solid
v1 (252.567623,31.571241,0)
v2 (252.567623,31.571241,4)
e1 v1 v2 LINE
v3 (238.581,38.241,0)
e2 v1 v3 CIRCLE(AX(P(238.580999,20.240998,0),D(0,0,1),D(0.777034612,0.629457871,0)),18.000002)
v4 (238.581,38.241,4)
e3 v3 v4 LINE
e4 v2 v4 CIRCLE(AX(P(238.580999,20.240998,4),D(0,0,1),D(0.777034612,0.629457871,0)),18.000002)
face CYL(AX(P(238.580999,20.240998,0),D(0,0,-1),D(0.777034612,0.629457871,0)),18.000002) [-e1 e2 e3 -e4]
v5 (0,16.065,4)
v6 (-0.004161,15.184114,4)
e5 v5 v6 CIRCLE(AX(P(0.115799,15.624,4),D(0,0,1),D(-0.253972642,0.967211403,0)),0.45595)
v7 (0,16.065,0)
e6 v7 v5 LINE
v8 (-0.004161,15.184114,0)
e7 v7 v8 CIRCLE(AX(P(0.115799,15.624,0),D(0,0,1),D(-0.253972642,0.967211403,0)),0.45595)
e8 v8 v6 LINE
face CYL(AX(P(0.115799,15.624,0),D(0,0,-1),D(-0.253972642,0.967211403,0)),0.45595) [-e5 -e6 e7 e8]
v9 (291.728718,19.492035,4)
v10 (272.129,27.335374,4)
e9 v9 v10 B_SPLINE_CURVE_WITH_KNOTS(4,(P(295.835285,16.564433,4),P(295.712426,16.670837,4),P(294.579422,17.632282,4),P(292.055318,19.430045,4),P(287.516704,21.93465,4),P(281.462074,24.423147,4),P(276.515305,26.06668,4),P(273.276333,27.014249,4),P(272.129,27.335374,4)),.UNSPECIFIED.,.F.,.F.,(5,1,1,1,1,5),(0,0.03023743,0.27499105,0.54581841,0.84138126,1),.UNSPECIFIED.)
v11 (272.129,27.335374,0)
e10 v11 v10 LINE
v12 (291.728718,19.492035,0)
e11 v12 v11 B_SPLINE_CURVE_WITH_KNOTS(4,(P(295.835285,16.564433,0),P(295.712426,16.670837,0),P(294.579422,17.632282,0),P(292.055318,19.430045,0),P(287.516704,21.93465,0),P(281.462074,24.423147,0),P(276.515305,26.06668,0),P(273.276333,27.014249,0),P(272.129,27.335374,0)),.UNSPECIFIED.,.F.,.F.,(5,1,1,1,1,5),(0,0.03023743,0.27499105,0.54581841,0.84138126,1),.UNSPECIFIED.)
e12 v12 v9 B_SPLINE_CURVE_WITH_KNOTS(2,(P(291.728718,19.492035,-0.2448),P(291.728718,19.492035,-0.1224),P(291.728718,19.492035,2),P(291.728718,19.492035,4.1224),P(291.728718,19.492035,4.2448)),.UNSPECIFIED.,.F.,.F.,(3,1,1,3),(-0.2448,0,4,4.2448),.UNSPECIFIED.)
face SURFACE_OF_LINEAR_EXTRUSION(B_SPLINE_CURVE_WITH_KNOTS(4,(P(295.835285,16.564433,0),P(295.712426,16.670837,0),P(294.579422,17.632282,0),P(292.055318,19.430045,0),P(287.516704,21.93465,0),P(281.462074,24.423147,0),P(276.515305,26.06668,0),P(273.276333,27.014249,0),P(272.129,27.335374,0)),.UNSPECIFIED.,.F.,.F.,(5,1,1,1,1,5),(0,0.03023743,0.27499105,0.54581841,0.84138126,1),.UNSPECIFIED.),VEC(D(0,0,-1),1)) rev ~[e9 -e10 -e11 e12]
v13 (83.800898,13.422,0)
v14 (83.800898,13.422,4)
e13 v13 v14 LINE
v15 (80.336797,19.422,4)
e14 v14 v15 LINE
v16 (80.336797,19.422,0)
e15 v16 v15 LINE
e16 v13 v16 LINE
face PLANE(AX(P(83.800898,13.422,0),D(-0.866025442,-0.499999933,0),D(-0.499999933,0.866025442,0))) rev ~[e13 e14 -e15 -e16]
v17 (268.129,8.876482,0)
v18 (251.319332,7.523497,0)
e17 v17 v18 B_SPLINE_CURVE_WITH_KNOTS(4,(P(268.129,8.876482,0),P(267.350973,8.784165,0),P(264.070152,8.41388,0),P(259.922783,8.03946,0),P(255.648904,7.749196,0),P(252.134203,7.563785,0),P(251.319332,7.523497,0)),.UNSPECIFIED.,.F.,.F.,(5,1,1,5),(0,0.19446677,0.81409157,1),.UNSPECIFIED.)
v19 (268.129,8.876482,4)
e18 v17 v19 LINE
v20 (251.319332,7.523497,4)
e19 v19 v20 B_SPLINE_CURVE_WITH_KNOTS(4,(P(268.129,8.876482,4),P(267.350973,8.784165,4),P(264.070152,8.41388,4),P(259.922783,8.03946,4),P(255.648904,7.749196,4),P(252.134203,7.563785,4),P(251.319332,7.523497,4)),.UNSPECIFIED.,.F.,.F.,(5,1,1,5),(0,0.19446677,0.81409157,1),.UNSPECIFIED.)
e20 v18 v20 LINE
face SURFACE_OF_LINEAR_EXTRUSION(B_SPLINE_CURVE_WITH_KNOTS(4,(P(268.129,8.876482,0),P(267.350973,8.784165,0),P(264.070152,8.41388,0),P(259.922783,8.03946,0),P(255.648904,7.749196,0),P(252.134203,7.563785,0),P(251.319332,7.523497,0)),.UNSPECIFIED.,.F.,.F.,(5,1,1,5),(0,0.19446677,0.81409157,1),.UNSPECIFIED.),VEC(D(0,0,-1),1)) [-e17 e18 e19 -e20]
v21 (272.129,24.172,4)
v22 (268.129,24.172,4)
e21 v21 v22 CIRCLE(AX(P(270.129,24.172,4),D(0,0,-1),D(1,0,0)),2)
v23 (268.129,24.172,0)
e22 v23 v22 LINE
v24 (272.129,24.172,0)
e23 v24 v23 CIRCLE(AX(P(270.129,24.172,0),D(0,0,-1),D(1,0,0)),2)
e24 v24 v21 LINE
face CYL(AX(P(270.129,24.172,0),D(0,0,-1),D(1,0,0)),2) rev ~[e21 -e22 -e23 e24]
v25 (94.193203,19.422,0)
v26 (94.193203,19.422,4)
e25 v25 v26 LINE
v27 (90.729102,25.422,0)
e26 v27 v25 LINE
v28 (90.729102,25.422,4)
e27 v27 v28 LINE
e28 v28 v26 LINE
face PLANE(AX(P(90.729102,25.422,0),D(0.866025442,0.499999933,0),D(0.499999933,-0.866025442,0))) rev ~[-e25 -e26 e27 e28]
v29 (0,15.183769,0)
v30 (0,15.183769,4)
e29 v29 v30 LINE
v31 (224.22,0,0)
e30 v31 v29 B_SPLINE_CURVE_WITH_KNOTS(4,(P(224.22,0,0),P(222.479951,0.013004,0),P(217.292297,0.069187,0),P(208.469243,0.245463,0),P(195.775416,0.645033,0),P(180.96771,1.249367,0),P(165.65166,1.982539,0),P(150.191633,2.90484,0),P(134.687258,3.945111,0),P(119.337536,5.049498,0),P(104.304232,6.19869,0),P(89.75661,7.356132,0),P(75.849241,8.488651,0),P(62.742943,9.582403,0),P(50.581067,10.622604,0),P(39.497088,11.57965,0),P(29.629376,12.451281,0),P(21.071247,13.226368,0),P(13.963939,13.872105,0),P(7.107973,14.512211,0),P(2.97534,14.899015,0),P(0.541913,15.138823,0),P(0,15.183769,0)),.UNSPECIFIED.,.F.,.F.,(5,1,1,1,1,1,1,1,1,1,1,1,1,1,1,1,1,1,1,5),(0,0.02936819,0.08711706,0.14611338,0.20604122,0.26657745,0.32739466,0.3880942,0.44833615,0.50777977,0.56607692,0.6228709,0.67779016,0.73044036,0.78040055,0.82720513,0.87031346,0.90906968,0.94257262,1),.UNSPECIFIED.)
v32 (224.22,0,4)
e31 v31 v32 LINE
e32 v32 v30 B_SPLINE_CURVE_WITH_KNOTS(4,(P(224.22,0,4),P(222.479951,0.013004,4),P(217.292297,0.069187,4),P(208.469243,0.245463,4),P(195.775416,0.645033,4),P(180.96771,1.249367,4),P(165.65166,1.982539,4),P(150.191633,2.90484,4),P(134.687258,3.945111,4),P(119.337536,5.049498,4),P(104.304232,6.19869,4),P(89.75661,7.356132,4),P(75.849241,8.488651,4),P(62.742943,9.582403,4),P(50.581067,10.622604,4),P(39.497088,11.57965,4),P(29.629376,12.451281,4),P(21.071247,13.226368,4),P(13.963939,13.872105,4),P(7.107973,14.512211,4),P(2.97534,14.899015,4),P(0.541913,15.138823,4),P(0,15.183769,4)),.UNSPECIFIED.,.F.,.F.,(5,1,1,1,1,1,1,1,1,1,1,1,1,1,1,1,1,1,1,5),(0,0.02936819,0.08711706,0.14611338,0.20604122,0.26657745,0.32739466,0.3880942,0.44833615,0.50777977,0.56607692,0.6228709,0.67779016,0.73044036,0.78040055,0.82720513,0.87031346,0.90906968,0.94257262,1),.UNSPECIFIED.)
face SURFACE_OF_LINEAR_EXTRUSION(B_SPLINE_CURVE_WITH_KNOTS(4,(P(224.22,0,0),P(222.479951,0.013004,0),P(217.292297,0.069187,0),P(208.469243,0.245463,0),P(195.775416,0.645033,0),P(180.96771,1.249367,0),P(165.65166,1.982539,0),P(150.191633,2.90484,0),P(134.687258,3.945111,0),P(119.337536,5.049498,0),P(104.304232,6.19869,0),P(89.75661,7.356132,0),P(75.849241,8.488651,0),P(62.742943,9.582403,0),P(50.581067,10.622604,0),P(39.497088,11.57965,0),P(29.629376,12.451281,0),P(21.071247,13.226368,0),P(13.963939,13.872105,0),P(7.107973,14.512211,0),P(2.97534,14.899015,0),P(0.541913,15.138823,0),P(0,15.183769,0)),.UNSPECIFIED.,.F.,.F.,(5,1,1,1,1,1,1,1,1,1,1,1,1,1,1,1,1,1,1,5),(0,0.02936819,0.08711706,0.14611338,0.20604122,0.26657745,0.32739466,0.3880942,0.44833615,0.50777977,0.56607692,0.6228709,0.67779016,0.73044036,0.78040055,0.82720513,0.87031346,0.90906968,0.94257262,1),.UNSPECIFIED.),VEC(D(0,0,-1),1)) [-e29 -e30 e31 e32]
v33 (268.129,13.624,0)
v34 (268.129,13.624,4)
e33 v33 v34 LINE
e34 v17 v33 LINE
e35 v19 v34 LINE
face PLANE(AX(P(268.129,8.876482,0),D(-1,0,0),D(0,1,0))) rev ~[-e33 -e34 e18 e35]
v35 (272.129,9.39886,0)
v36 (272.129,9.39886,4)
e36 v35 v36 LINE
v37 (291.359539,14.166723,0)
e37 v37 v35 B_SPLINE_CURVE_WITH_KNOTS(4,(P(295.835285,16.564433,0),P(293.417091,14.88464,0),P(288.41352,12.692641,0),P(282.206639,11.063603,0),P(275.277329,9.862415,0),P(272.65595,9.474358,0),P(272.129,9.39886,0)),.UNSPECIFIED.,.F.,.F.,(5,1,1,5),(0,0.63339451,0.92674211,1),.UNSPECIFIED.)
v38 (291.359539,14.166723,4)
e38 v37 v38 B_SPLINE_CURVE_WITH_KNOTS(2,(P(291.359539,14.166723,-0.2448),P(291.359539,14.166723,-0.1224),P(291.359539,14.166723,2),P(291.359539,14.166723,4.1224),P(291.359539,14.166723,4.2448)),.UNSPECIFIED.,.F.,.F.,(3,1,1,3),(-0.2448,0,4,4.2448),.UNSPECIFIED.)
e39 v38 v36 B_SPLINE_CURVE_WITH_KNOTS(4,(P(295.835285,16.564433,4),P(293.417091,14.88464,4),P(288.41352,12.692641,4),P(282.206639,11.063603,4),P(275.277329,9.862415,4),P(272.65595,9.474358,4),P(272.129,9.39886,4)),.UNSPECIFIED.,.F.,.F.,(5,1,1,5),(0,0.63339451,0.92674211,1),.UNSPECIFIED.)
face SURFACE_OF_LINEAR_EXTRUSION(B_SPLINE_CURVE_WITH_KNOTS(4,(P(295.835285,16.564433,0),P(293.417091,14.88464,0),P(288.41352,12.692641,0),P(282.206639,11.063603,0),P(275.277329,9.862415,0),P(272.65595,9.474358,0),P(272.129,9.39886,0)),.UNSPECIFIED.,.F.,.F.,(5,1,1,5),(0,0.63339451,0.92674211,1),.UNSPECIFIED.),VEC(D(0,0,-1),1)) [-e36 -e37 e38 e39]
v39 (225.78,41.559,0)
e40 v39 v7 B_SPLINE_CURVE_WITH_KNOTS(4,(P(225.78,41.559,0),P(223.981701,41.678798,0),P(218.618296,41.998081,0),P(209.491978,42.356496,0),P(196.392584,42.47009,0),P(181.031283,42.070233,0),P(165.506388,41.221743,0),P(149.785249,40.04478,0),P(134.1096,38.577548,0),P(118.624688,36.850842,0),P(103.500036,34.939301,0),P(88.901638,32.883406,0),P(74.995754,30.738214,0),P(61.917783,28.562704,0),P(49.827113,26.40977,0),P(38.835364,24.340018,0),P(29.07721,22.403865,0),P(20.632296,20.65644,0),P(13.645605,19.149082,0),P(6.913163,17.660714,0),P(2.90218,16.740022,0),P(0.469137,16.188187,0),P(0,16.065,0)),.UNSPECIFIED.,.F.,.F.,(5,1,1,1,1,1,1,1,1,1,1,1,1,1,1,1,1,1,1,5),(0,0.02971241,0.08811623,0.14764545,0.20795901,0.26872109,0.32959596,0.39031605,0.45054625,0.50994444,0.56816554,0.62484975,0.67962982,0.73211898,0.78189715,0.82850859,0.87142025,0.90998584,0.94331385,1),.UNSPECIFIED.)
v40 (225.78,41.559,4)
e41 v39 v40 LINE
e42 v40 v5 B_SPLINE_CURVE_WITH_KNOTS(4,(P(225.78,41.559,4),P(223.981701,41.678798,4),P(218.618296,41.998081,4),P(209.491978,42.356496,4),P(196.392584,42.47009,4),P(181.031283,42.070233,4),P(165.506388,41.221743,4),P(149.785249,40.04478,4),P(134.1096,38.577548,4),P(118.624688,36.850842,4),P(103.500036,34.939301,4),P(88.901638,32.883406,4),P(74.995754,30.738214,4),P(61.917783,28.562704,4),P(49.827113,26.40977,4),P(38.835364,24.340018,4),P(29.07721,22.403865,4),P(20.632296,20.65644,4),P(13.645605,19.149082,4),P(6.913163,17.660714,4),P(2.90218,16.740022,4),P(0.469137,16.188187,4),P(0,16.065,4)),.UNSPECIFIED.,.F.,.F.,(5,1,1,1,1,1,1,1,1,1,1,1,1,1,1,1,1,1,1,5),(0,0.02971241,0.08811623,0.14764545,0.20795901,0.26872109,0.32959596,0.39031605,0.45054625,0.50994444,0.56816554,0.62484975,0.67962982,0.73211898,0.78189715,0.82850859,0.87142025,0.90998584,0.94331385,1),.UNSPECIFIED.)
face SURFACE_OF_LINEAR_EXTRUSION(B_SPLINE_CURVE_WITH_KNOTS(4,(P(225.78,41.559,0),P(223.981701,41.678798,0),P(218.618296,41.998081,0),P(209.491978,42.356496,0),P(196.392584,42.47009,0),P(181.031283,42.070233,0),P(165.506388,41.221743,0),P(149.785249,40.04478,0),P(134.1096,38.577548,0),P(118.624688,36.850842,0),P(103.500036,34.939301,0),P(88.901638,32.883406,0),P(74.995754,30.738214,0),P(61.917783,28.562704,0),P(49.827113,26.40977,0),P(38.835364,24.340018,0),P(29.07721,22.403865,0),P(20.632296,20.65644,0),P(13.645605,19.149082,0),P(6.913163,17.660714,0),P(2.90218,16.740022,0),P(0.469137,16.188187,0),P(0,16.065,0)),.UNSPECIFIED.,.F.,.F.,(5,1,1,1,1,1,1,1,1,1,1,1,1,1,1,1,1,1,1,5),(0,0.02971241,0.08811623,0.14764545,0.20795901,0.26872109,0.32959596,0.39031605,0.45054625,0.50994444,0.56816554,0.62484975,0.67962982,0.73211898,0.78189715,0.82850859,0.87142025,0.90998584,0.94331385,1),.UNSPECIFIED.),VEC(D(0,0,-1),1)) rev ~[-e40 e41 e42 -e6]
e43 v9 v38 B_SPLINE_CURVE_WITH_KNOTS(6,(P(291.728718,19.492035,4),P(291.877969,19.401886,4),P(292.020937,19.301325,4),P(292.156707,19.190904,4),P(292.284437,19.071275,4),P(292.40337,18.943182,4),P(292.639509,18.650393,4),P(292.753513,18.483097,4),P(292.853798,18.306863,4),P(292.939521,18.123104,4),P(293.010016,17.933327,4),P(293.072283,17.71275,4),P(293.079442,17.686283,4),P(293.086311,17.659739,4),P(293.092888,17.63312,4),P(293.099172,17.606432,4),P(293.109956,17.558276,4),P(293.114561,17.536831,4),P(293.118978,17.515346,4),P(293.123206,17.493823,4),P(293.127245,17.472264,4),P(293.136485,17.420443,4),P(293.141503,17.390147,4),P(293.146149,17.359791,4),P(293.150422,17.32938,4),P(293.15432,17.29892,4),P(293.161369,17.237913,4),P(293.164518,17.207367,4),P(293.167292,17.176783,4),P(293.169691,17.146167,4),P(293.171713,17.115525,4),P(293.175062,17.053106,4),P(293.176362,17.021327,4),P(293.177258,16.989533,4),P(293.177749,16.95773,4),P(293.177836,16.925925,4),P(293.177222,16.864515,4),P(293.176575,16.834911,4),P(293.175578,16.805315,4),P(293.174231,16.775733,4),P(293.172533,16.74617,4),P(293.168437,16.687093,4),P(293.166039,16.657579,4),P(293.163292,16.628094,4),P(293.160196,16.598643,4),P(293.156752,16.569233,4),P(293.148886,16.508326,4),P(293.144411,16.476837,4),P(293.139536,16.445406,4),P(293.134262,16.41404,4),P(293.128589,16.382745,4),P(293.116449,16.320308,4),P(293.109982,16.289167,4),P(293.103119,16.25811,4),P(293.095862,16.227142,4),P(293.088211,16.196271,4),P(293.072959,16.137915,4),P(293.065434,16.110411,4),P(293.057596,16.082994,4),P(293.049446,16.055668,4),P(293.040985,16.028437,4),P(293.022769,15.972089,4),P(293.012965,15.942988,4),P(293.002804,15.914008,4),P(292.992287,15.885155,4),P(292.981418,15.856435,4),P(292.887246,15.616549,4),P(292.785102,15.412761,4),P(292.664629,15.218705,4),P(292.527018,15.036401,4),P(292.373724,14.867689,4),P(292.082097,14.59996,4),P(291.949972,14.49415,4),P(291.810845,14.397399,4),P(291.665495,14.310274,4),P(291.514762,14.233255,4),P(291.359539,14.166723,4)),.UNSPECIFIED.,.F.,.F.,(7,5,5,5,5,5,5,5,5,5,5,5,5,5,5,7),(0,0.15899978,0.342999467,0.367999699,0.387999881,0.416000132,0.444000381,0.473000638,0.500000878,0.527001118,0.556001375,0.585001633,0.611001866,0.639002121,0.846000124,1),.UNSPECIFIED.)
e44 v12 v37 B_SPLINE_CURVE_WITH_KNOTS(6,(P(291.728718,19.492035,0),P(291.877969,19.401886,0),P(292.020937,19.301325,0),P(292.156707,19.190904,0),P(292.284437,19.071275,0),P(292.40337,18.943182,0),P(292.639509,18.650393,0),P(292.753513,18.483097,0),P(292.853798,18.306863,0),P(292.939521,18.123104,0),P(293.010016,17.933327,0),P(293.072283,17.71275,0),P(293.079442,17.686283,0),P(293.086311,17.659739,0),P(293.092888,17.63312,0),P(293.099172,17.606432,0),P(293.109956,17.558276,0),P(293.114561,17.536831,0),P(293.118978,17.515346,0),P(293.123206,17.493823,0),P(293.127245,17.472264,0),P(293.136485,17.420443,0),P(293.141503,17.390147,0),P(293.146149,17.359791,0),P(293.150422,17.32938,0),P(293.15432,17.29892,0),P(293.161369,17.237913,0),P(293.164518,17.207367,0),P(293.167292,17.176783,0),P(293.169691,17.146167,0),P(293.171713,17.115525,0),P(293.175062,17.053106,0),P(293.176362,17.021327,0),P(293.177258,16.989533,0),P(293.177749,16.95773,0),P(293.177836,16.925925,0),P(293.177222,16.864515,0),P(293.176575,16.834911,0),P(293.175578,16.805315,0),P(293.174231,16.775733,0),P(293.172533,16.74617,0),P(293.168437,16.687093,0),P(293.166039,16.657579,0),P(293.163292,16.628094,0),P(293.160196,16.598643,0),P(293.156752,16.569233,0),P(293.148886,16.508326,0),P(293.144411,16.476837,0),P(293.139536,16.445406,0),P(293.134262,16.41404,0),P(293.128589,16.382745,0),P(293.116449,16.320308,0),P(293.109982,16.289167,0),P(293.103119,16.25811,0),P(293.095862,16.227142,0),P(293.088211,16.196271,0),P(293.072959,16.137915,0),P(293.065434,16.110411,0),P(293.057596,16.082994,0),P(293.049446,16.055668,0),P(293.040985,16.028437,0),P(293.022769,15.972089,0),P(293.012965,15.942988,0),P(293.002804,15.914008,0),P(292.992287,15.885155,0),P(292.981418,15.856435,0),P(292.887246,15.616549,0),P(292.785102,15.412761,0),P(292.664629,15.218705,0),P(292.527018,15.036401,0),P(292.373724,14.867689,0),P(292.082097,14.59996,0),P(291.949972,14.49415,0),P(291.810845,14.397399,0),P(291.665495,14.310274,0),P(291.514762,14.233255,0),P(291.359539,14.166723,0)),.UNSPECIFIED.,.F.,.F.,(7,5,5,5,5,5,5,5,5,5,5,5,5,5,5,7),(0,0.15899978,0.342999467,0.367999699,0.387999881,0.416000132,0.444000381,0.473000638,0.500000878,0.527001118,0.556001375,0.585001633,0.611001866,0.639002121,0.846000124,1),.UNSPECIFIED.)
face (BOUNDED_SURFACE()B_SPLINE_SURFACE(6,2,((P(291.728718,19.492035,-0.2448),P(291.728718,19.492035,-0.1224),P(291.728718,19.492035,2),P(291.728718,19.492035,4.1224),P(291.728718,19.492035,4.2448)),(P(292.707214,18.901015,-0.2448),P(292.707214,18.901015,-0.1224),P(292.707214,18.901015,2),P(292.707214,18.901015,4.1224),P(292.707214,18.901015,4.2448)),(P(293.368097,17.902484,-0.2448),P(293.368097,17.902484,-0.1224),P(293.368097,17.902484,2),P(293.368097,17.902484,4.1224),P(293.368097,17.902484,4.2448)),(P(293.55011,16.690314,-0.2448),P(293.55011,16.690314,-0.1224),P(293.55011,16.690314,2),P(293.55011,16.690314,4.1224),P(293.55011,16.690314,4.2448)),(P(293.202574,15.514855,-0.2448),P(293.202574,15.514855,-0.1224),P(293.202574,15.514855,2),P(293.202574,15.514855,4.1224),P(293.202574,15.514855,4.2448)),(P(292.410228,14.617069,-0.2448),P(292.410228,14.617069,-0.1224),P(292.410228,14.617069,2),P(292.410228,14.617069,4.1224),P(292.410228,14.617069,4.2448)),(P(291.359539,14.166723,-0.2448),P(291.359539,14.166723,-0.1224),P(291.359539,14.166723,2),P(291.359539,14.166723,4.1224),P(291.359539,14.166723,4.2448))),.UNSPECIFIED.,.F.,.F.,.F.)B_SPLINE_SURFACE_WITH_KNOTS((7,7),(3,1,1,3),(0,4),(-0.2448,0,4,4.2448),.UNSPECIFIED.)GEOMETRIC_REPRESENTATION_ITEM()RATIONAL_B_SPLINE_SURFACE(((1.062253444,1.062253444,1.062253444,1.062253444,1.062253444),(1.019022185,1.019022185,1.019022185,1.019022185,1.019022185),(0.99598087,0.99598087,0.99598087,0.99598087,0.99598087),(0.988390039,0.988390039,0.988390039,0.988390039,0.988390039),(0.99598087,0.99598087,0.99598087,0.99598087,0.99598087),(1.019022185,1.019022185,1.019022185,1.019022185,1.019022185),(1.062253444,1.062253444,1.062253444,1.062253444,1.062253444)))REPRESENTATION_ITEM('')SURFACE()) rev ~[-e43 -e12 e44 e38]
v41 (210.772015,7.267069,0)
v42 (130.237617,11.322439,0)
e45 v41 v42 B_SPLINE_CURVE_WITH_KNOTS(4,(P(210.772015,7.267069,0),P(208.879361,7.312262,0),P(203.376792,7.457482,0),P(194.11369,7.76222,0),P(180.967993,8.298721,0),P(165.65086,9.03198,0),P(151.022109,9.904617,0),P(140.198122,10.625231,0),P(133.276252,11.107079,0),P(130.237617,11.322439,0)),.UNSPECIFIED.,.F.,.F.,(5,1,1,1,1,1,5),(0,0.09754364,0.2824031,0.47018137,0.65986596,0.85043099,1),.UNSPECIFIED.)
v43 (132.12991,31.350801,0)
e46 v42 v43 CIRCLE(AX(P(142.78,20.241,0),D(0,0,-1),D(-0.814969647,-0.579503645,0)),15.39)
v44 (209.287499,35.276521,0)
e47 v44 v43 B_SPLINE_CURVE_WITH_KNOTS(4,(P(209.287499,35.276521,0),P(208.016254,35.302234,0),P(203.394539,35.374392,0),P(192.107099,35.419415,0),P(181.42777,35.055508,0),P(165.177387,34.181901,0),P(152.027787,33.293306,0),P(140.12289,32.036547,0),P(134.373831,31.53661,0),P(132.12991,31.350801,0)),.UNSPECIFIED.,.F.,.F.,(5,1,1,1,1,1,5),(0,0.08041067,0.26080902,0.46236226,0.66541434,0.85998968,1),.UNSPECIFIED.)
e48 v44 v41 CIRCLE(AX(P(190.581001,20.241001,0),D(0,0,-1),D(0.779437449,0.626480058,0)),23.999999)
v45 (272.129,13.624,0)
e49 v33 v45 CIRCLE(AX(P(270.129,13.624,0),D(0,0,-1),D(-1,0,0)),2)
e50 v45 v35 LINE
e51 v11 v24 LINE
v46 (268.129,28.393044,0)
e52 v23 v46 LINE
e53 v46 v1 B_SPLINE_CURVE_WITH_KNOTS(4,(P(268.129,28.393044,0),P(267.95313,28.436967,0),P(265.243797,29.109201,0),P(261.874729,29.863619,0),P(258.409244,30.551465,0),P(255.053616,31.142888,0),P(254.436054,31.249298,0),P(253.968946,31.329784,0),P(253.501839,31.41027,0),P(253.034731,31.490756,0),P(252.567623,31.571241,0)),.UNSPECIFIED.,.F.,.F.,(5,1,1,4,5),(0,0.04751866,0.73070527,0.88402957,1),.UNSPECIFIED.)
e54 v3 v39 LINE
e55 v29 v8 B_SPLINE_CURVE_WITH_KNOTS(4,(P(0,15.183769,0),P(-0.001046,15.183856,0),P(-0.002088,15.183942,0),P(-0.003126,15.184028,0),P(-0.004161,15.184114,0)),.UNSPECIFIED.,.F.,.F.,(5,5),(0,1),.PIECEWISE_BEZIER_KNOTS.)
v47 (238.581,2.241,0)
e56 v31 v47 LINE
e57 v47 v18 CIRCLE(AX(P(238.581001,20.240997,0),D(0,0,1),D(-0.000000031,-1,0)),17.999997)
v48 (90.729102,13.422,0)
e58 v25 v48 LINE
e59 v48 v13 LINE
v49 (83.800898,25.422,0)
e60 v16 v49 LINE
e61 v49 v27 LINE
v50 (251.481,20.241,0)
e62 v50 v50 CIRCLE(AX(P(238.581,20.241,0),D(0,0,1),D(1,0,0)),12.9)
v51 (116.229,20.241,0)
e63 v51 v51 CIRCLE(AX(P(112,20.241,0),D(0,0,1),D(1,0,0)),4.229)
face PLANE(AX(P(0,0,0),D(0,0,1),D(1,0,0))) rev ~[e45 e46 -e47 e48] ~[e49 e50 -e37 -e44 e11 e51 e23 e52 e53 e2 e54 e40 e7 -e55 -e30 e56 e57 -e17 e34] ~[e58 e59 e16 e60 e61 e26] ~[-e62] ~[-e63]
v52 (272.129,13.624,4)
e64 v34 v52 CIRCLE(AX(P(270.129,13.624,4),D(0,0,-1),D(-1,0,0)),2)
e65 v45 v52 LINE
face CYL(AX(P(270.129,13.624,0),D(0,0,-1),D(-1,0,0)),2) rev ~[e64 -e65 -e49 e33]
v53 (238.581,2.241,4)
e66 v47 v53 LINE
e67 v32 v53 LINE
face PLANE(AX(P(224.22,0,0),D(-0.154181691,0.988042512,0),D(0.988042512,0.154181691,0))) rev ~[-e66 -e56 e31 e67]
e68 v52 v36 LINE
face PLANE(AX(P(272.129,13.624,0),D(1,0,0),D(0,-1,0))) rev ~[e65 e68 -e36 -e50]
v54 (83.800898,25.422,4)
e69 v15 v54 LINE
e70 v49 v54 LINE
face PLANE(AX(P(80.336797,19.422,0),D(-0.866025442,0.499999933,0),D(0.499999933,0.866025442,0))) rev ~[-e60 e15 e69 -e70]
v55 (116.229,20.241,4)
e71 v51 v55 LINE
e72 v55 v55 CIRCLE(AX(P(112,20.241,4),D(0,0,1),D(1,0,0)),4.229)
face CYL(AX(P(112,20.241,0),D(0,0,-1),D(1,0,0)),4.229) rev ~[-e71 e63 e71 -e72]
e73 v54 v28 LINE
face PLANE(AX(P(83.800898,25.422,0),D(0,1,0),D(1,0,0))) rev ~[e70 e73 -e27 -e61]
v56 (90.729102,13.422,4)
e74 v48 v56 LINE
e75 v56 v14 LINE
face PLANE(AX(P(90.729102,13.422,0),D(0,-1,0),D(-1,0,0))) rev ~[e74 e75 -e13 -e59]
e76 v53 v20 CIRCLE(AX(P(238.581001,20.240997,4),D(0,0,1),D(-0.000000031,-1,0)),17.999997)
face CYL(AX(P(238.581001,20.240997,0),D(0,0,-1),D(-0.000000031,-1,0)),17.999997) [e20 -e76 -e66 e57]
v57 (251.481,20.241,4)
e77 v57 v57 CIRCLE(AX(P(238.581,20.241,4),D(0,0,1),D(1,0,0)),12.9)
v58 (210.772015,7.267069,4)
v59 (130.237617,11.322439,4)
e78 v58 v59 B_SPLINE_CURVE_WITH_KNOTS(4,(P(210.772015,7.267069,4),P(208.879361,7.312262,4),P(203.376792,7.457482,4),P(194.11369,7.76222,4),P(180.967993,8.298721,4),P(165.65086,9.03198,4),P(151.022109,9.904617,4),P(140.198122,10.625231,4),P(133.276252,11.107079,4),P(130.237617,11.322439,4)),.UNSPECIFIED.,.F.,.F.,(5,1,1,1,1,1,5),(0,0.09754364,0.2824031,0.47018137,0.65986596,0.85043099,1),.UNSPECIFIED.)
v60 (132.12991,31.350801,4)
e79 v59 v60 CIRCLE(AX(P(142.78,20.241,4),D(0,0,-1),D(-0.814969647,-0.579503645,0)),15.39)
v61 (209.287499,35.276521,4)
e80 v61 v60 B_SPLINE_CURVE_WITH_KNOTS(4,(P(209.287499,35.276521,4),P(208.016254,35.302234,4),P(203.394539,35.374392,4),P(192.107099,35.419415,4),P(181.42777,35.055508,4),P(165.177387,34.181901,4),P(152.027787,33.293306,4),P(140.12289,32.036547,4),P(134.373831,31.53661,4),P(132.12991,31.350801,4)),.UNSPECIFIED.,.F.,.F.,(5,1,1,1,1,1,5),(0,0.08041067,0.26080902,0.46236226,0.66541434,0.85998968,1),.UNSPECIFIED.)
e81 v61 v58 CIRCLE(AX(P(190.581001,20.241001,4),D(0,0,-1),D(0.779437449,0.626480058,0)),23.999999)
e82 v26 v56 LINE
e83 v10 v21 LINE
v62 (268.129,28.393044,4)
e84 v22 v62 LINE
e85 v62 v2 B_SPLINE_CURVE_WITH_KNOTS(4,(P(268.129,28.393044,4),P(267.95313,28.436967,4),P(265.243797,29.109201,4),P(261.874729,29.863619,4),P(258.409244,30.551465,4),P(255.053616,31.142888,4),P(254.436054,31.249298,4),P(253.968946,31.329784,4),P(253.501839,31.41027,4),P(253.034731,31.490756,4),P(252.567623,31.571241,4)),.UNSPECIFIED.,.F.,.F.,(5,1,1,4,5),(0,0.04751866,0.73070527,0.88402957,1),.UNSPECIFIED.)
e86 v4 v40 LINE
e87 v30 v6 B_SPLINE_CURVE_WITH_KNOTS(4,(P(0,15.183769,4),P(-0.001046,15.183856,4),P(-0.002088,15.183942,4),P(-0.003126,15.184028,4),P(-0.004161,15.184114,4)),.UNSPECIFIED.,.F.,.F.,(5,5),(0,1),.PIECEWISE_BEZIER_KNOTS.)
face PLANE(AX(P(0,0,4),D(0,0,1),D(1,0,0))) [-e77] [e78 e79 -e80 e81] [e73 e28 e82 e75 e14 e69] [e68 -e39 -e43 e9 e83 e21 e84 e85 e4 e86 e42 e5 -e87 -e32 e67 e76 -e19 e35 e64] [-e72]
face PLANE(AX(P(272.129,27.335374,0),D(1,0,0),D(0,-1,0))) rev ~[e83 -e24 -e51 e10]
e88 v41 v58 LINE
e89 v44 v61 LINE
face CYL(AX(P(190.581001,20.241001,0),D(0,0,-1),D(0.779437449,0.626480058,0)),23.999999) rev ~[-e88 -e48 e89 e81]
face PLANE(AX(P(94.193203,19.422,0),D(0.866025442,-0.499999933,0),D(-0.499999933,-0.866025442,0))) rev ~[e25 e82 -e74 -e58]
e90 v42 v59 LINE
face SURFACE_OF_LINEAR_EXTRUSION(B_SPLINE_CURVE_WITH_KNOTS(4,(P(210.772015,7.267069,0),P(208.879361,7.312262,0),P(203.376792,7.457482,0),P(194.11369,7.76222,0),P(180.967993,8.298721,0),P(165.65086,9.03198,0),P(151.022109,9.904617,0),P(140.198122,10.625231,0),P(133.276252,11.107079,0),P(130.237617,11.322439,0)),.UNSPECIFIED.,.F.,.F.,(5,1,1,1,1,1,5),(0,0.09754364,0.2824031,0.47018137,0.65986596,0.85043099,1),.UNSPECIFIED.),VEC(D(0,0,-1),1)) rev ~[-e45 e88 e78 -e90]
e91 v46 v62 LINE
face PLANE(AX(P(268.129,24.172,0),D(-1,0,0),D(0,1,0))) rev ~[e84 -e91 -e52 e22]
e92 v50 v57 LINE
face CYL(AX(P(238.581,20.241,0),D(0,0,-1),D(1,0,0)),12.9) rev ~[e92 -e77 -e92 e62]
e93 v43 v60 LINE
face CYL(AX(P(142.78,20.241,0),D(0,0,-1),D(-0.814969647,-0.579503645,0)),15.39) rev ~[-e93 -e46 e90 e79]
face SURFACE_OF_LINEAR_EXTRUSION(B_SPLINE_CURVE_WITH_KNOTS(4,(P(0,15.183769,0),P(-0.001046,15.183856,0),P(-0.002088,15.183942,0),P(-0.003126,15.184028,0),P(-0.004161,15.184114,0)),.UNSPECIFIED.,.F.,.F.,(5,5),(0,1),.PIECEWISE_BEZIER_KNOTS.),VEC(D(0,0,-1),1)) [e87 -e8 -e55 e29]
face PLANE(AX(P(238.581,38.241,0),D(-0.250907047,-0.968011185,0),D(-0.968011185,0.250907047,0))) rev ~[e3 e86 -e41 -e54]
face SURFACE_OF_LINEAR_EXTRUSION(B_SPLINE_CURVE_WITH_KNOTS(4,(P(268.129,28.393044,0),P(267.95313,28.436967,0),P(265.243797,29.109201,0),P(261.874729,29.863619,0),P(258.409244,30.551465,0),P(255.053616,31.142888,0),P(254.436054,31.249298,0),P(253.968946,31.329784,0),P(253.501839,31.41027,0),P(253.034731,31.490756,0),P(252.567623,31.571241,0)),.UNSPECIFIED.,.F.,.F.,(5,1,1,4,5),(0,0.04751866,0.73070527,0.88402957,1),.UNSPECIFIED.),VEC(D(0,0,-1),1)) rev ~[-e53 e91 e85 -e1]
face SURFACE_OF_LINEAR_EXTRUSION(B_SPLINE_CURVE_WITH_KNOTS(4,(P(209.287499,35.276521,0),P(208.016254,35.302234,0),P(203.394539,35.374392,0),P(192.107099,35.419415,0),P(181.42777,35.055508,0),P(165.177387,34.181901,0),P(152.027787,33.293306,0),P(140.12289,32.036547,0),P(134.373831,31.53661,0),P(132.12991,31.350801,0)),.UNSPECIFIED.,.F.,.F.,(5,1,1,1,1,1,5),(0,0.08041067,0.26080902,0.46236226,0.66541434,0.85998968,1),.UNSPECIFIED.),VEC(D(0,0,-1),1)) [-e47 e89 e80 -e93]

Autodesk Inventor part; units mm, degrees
ref_plane "YZ Plane" through (0, 0, 0) normal (1, 0, 0) x (0, 1, 0)
ref_plane "XZ Plane" through (0, 0, 0) normal (0, 1, 0) x (-1, 0, 0)
ref_plane "XY Plane" through (0, 0, 0) normal (0, 0, 1) x (1, 0, 0)
sketch "Sketch1" plane through (0, 0, 0) normal (0, 0, 1) x (1, 0, 0)
  spline S0 degree 4 poles (254.436054, 38.258138) (252.159915, 38.650332) (246.788709, 39.499265) (237.984874, 40.618279) (225.357478, 41.704285) (211.202741, 42.341661) (196.392584, 42.47009) (181.031283, 42.070233) (165.506388, 41.221743) (149.785249, 40.04478) (134.1096, 38.577548) (118.624688, 36.850842) (103.500036, 34.939301) (88.901638, 32.883406) (74.995754, 30.738214) (61.917783, 28.562704) (49.827113, 26.40977) (38.835364, 24.340018) (29.07721, 22.403865) (20.632296, 20.65644) (13.645605, 19.149082) (6.913163, 17.660714) (2.90218, 16.740022) (0.469137, 16.188187) (0, 16.065) knots 0.21429705 0.21429705 0.21429705 0.21429705 0.21429705 0.2433201 0.28177524 0.32154178 0.36237973 0.40400459 0.44617789 0.48866482 0.5312306 0.57368816 0.61580317 0.65733642 0.6980466 0.73768213 0.77598623 0.81268845 0.84749504 0.88008735 0.91009265 0.93705903 0.9603631 1 1 1 1 1
  spline S1 degree 4 poles (299.999997, 15.624) (299.805651, 13.312974) (297.70854, 10.343184) (293.050897, 7.5008) (285.395888, 4.883043) (278.112378, 3.216454) (269.51472, 1.892454) (259.681019, 0.912997) (248.712883, 0.278332) (236.711867, -0.030891) (223.806667, -0.050368) (210.125319, 0.193333) (195.775416, 0.645033) (180.96771, 1.249367) (165.65166, 1.982539) (150.191633, 2.90484) (134.687258, 3.945111) (119.337536, 5.049498) (104.304232, 6.19869) (89.75661, 7.356132) (75.849241, 8.488651) (62.742943, 9.582403) (50.581067, 10.622604) (39.497088, 11.57965) (29.629376, 12.451281) (21.071247, 13.226368) (13.963939, 13.872105) (7.103576, 14.512622) (2.968279, 14.899676) (0.533018, 15.1397) (-0.004161, 15.184114) knots 0 0 0 0 0 0.05437224 0.07982113 0.10791215 0.1384988 0.1713415 0.20618709 0.24278377 0.28089063 0.3202767 0.36071301 0.4020228 0.44398485 0.4863729 0.52895769 0.5714601 0.61364209 0.65526508 0.6960853 0.73585299 0.77430798 0.81117416 0.84615676 0.87892978 0.90911464 0.93625212 0.9597112 1 1 1 1 1
  arc A0 (0, 16.065) -> (-0.004161, 15.184114) centre (0.115799, 15.624) ccw
  line L0 (0.115799, 15.624) -> (227.990221, 15.624) construction
  line L1 (299.999997, 15.624) -> (0.115799, 15.624) construction
  line L2 (299.999997, 15.624) -> (199.999997, 15.624) construction
  line L3 (199.999997, 15.624) -> (199.999997, 42.37734) construction
  line L4 (199.999997, 15.624) -> (199.999997, 0.52729)
  line L5 (0, 0) -> (0, 20.241)
  line L6 (0, 20.241) -> (238.581, 20.241) construction
  circle A1 centre (238.581, 20.241) radius 14
  line L7 (238.581, 20.241) -> (208.581, 20.241)
  line L8 (238.581, 25.359) -> (238.581, 20.241)
  line L9 (0, 20.241) -> (112, 20.241) construction
  circle A2 centre (112, 20.241) radius 5.39
  line L10 (0, 15.624) -> (112, 15.624) construction
  line L11 (0, 15.624) -> (112, 15.624) construction
  line L12 (112, 15.624) -> (112, 35.994456)
  line L13 (112, 15.624) -> (112, 5.61525)
  spline S2 degree 4 poles (299.285198, 20.241) (299.227939, 20.131643) (299.16804, 20.023225) (299.105573, 19.915754) (299.040612, 19.809235) knots 0 0 0 0 0 1 1 1 1 1
  line L14 (299.207055, 20.082158) -> (298.87417, 19.536312) construction
  arc A3 (298.903999, 19.593162) -> (299.170168, 20.029611) centre (292.291091, 23.925437) ccw construction
  line L15 (299.43203, 20.521431) -> (299.138367, 19.960569) construction
  arc A4 (299.163926, 20.01882) -> (299.398715, 20.467241) centre (292.801001, 23.636075) ccw construction
  spline S3 degree 2 poles (295.850621, 16.559978) (295.157262, 16.069203) (294.393311, 15.624) knots 0 0 0 1 1 1
  line L16 (294.550692, 15.715716) -> (294.235931, 15.532284) construction
  arc A5 (294.267154, 15.551069) -> (294.518956, 15.69781) centre (283.884356, 33.65696) ccw construction
  spline S4 degree 4 poles (296.856901, 15.624) (296.618326, 15.862944) (296.370731, 16.098547) (296.114674, 16.330852) (295.850621, 16.559978) knots 0 0 0 0 0 1 1 1 1 1
  spline S5 degree 4 poles (219.58717, 34.91187) (218.695351, 34.95198) (214.858509, 35.106335) (210.707211, 35.329502) (192.898023, 35.446366) (181.42777, 35.055508) (165.177387, 34.181901) (149.561876, 33.12667) (133.828431, 31.347909) (128.265438, 31.097419) (123.390775, 30.590026) knots 0 0 0 0 0 0.13924435 0.23321956 0.36393672 0.50998276 0.65711487 0.7981047 1 1 1 1 1
  line L17 (295.959293, 16.465681) -> (295.74195, 16.654276) construction
  arc A6 (295.937354, 16.484307) -> (295.763482, 16.635181) centre (281.87292, 0.451609) ccw construction
  line L18 (232.743774, 34.364452) -> (201.193566, 35.681454) construction
  arc A7 (229.586762, 34.454933) -> (204.347135, 35.508511) centre (136.348344, -1896.324468) ccw construction
  arc A8 (264.266057, 15.123) -> (264.360826, 15.624) centre (238.581, 20.241) ccw
  circle A9 centre (238.581, 20.241) radius 24
  circle A10 centre (112, 20.241) radius 15.39
  spline S6 degree 4 poles (299.999997, 15.624) (300.269142, 17.933652) (298.783415, 21.267693) (294.693448, 24.979847) (287.53174, 28.940551) (280.486947, 31.820538) (271.480983, 34.718213) (262.486804, 36.793013) (257.700386, 37.695672) (254.436054, 38.258138) knots 0 0 0 0 0 0.24755477 0.36385739 0.4925498 0.63299607 0.77826439 1 1 1 1 1
  line L19 (285.294543, 32.941011) -> (223.577565, 43.575266) construction
  arc A11 (278.722442, 32.634865) -> (229.668212, 41.087243) centre (217.218351, -177.738587) ccw construction
  line L20 (285.294543, 32.941011) -> (223.577565, 43.575266) construction
  arc A12 (278.877125, 33.041766) -> (229.658629, 41.522447) centre (200.894913, -272.473315) ccw construction
  spline S7 degree 4 poles (251.493, 31.73616) (243.700929, 32.967588) (232.160237, 34.296592) (216.442824, 35.287928) (196.392341, 35.461091) (181.031705, 35.061513) (165.505292, 34.212684) (149.788285, 33.036509) (134.101234, 31.567156) (118.647366, 29.846206) (103.439709, 27.919279) (89.058912, 25.903716) (74.837064, 23.692714) (62.488433, 21.669546) (49.639937, 19.354465) (46.379459, 18.742869) (43.812536, 18.259032) knots 0 0 0 0 0 0.1639631 0.23233838 0.3020312 0.37264227 0.44377843 0.51504665 0.58613365 0.65664712 0.72618654 0.7943479 0.86070997 0.92034602 1 1 1 1 1 construction
  spline S8 degree 4 poles (295.845009, 16.556007) (295.719822, 16.664559) (294.584958, 17.628339) (292.058546, 19.428263) (287.516704, 21.93465) (280.467029, 24.832118) (271.97142, 27.522599) (264.208658, 29.400369) (258.409244, 30.551465) (255.053616, 31.142888) (254.436054, 31.249298) (253.968946, 31.329784) (253.501839, 31.41027) (253.034731, 31.490756) (252.567623, 31.571241) knots 0 0 0 0 0 0.01890503 0.16895946 0.33499927 0.51620401 0.71116085 0.9183366 0.96483207 0.96483207 0.96483207 0.96483207 1 1 1 1 1
  line L21 (285.294543, 25.932171) -> (223.577565, 36.566425) construction
  line L22 (285.294543, 25.932171) -> (223.577565, 36.566425) construction
  arc A13 (278.722442, 25.626025) -> (229.668212, 34.078402) centre (217.218351, -184.747428) ccw construction
  line L23 (270.129, 9.125374) -> (275.129, 9.125374) construction
  line L24 (281.07, 24.45816) -> (286.07, 24.45816) construction
  line L25 (318.821413, -3.367269) -> (272.868604, 36.479282) construction
  arc A14 (303.207925, 0.551953) -> (278.959518, 21.578206) centre (281.857648, 0.425162) ccw construction
  spline S9 degree 4 poles (295.835285, 16.564433) (293.417091, 14.88464) (288.41352, 12.692641) (280.70627, 10.669821) (269.511023, 8.939829) (259.682627, 7.96324) (248.712204, 7.32734) (236.712148, 7.018633) (223.806545, 6.998947) (210.125394, 7.242728) (195.775305, 7.694406) (180.967993, 8.298721) (165.65086, 9.03198) (150.193891, 9.954022) (134.681006, 10.995018) (119.354518, 12.097424) (104.258979, 13.251926) (89.874814, 14.39542) (75.752353, 15.547068) (62.906491, 16.616479) (50.510696, 17.677636) (46.516568, 18.024605) (43.812536, 18.259032) knots 0 0 0 0 0 0.08476672 0.12402522 0.16617938 0.21090431 0.25787677 0.30678758 0.35734028 0.40924097 0.46226281 0.51612182 0.5705276 0.62518592 0.67973848 0.7338798 0.78730362 0.83969707 0.89073959 0.93714265 1 1 1 1 1
  spline S10 degree 4 poles (21.462276, 20.241) (20.622656, 20.316984) (20.124028, 20.362207) (19.919133, 20.380856) (19.554048, 20.414029) knots 0 0 0 0 0 1 1 1 1 1 construction
  line L26 (68.488377, 16.119755) -> (19.136695, 20.398308) construction
  arc A15 (63.551474, 16.528056) -> (24.070206, 19.950891) centre (-819.899413, -9944.371227) ccw construction
  line L27 (21.724437, 20.217275) -> (21.200116, 20.264725) construction
  arc A16 (21.252548, 20.259982) -> (21.672005, 20.222022) centre (898.635849, 9712.955601) ccw construction
  line L28 (74.254065, 23.996937) -> (13.371006, 12.521126) construction
  arc A17 (68.175943, 22.793945) -> (19.469999, 13.613391) centre (1053.390082, -5337.891027) ccw construction
  spline S11 degree 4 poles (218.437499, 7.193419) (217.617295, 7.240848) (213.819214, 7.468804) (209.586315, 6.850678) (192.548492, 7.944114) (181.146901, 8.16297) (165.746092, 9.02826) (149.142366, 9.880106) (139.977668, 10.751942) (129.107316, 11.246393) (124.68665, 11.528881) knots 0 0 0 0 0 0.12763083 0.21372336 0.33362841 0.4674456 0.60262129 0.73842442 0.88039529 0.88039529 0.88039529 0.88039529 0.88039529
  line L29 (133.533683, 10.96354) -> (115.839617, 12.094223) construction
  arc A18 (117.617989, 12.078874) -> (131.767822, 11.174674) centre (141.026952, 267.238396) ccw construction
  line L30 (140.664975, 32.388062) -> (106.116576, 28.79199) construction
  arc A19 (137.221962, 31.449676) -> (109.679039, 28.58279) centre (140.622493, -134.959578) ccw construction
  circle A20 centre (238.581, 20.241) radius 18
  line L31 (238.581, 38.241) -> (225.78, 41.559)
  line L32 (238.581, 2.241) -> (224.22, 0)
  line L33 (214.581, 20.241) -> (214.581, 42.126574) construction
  line L34 (127.39, 20.241) -> (127.39, 11.525517) construction
  line L35 (127.39, 20.241) -> (131.31394, 20.241) construction
  line L36 (96.61, 20.241) -> (96.61, 13.863077) construction
  line L37 (270.129, 5.61525) -> (270.129, 15.624) construction
  line L38 (272.129, 7.61525) -> (272.129, 13.624)
  line L39 (268.129, 13.624) -> (268.129, 7.61525)
  arc A21 (268.129, 7.61525) -> (272.129, 7.61525) centre (270.129, 7.61525) ccw
  arc A22 (272.129, 13.624) -> (268.129, 13.624) centre (270.129, 13.624) ccw
  line L40 (270.129, 32.18075) -> (270.129, 22.172) construction
  line L41 (272.129, 30.18075) -> (272.129, 24.172)
  line L42 (268.129, 24.172) -> (268.129, 30.18075)
  arc A23 (272.129, 30.18075) -> (268.129, 30.18075) centre (270.129, 30.18075) ccw
  arc A24 (268.129, 24.172) -> (272.129, 24.172) centre (270.129, 24.172) ccw
  arc A25 (199.999997, 42.315467) -> (199.853847, 42.377258) centre (190.581, 20.241) ccw
  arc A26 (171.272979, 34.495835) -> (171.268099, 34.489223) centre (190.581, 20.241) ccw
  arc A27 (210.748391, 7.230376) -> (209.287499, 35.276521) centre (190.581, 20.241) ccw
  arc A28 (169.445537, 8.870309) -> (169.474432, 8.816764) centre (190.581, 20.241) ccw
  arc A29 (153.976817, 9.682431) -> (154.030255, 9.739387) centre (142.78, 20.241) ccw
  arc A30 (151.241916, 33.095886) -> (151.219343, 33.110716) centre (142.78, 20.241) ccw
  arc A31 (132.12991, 31.350801) -> (130.322928, 11.203663) centre (142.78, 20.241) ccw
  arc A32 (95.274104, 13.969298) -> (95.169771, 26.74146) centre (81.22, 20.241) ccw
  arc A33 (66.333989, 16.334751) -> (66.538876, 15.624) centre (81.22, 20.241) ccw
  line L43 (112, 20.241) -> (112, 14.851) construction
  line L44 (112, 14.851) -> (87.265, 19.422) construction
  circle A34 centre (87.265, 19.422) radius 4
  circle A35 centre (238.581, 20.241) radius 12.9
  circle A36 centre (112, 20.241) radius 4.229
  circle A37 centre (87.265, 19.422) radius 6
  line L45 (83.800898, 13.422) -> (80.336797, 19.422)
  line L46 (80.336797, 19.422) -> (83.800898, 25.422)
  line L47 (83.800898, 25.422) -> (90.729102, 25.422)
  line L48 (90.729102, 25.422) -> (94.193203, 19.422)
  line L49 (94.193203, 19.422) -> (90.729102, 13.422)
  line L50 (90.729102, 13.422) -> (83.800898, 13.422)
  point P0 (0.783, 16.254)
  point P1 (3.213, 16.812)
  point P2 (7.239, 17.724)
  point P3 (12.813, 18.96)
  point P4 (19.884, 20.484)
  point P5 (28.374, 22.245)
  point P6 (38.199, 24.195)
  point P7 (49.254, 26.28)
  point P8 (61.419, 28.446)
  point P9 (74.571, 30.636)
  point P10 (88.56, 32.793)
  point P11 (103.242, 34.86)
  point P12 (118.455, 36.783)
  point P13 (134.028, 38.511)
  point P14 (149.793, 39.984)
  point P15 (165.576, 41.16)
  point P16 (181.206, 41.985)
  point P17 (196.638, 42.363)
  point P18 (211.554, 42.222)
  point P19 (239.145, 40.389)
  point P20 (262.68, 36.666)
  point P21 (272.577, 34.218)
  point P22 (281.07, 31.467)
  point P23 (288.069, 28.491)
  point P24 (293.505, 25.359)
  point P25 (297.324, 22.137)
  point P26 (300, 15.624)
  point P27 (0.861, 15.105)
  point P28 (3.342, 14.868)
  point P29 (7.446, 14.481)
  point P30 (13.122, 13.953)
  point P31 (20.31, 13.296)
  point P32 (28.92, 12.519)
  point P33 (38.856, 11.64)
  point P34 (50.007, 10.674)
  point P35 (62.244, 9.63)
  point P36 (75.429, 8.529)
  point P37 (89.418, 7.389)
  point P38 (104.052, 6.228)
  point P39 (119.172, 5.076)
  point P40 (134.613, 3.966)
  point P41 (150.207, 2.928)
  point P42 (165.783, 2.013)
  point P43 (181.167, 1.263)
  point P44 (196.068, 0.663)
  point P45 (210.468, 0.225)
  point P46 (237.189, 0.039)
  point P47 (249.246, 0.378)
  point P48 (260.262, 1.05)
  point P49 (270.129, 2.076)
  point P50 (278.739, 3.462)
  point P51 (285.993, 5.211)
  point P52 (291.81, 7.314)
  point P53 (296.121, 9.756)
  point P54 (298.863, 12.531)
  point P55 (199.999997, 15.624)
  point P56 (225.364219, 15.624)
  point P57 (238.581, 6.241)
  point P58 (238.581, 34.241)
  point P59 (225.364219, 15.624)
  point P60 (251.797781, 15.624)
  point P61 (0, 16.065)
  point P62 (0, 15.183769)
  point P63 (224.581, 20.241)
  point P64 (112, 25.631)
  point P65 (0, 9.065)
  point P66 (0.783, 9.254)
  point P67 (3.213, 9.812)
  point P68 (7.239, 10.724)
  point P69 (12.813, 11.96)
  point P70 (19.884, 13.484)
  point P71 (28.374, 15.245)
  point P72 (38.199, 17.195)
  point P73 (49.254, 19.28)
  point P74 (61.419, 21.446)
  point P75 (74.571, 23.636)
  point P76 (88.56, 25.793)
  point P77 (103.242, 27.86)
  point P78 (118.455, 29.783)
  point P79 (134.028, 31.511)
  point P80 (149.793, 32.984)
  point P81 (165.576, 34.16)
  point P82 (181.206, 34.985)
  point P83 (225.78, 34.559)
  point P84 (239.145, 33.389)
  point P85 (251.493, 31.745)
  point P86 (262.68, 29.666)
  point P87 (272.577, 27.218)
  point P88 (281.07, 24.467)
  point P89 (288.069, 21.491)
  point P90 (293.505, 18.359)
  point P91 (297.324, 15.137)
  point P92 (299.493, 11.879)
  point P93 (300, 8.624)
  point P94 (-0.004161, 22.184114)
  point P95 (0.861, 22.105)
  point P96 (3.342, 21.868)
  point P97 (7.446, 21.481)
  point P98 (13.122, 20.953)
  point P99 (20.31, 20.296)
  point P100 (28.92, 19.519)
  point P101 (38.856, 18.64)
  point P102 (50.007, 17.674)
  point P103 (62.244, 16.63)
  point P104 (75.429, 15.529)
  point P105 (89.418, 14.389)
  point P106 (104.052, 13.228)
  point P107 (119.172, 12.076)
  point P108 (134.613, 10.966)
  point P109 (150.207, 9.928)
  point P110 (165.783, 9.013)
  point P111 (181.167, 8.263)
  point P112 (196.068, 7.663)
  point P113 (210.468, 7.225)
  point P114 (224.22, 7)
  point P115 (237.189, 7.039)
  point P116 (249.246, 7.378)
  point P117 (260.262, 8.05)
  point P118 (270.129, 9.076)
  point P119 (278.739, 10.462)
  point P120 (285.993, 12.211)
  point P121 (291.81, 14.314)
  point P122 (296.121, 16.756)
  point P123 (298.863, 19.531)
  point P124 (300, 22.624)
  point P125 (18.740477, 20.241)
  point P126 (216.96867, 35.022953)
  point P127 (0, 16.065)
  point P128 (296.856901, 15.624)
  point P129 (294.393311, 15.624)
  point P130 (219.58717, 34.91187)
  point P131 (123.390775, 30.590026)
  point P132 (254.436054, 38.258138)
  point P133 (0, 9.05616)
  point P134 (0.783, 9.24516)
  point P135 (3.213, 9.80316)
  point P136 (7.239, 10.71516)
  point P137 (12.813, 11.95116)
  point P138 (19.884, 13.47516)
  point P139 (28.374, 15.23616)
  point P140 (38.199, 17.18616)
  point P141 (49.254, 19.27116)
  point P142 (61.419, 21.43716)
  point P143 (74.571, 23.62716)
  point P144 (88.56, 25.78416)
  point P145 (103.242, 27.85116)
  point P146 (118.455, 29.77416)
  point P147 (134.028, 31.50216)
  point P148 (149.793, 32.97516)
  point P149 (165.576, 34.15116)
  point P150 (181.206, 34.97616)
  point P151 (196.638, 35.35416)
  point P152 (211.554, 35.21316)
  point P153 (225.78, 34.55016)
  point P154 (262.68, 29.65716)
  point P155 (272.577, 27.20916)
  point P156 (297.324, 15.12816)
  point P157 (299.493, 11.87016)
  point P158 (300, 8.61516)
  point P159 (254.436054, 31.249298)
  point P160 (216.884838, -206.362485)
  point P161 (278.876889, 26.073396)
  point P162 (229.590604, 33.866167)
  point P163 (-0.004161, 22.233488)
  point P164 (0.861, 22.154374)
  point P165 (3.342, 21.917374)
  point P166 (7.446, 21.530374)
  point P167 (13.122, 21.002374)
  point P168 (28.92, 19.568374)
  point P169 (38.856, 18.689374)
  point P170 (50.007, 17.723374)
  point P171 (62.244, 16.679374)
  point P172 (75.429, 15.578374)
  point P173 (89.418, 14.438374)
  point P174 (104.052, 13.277374)
  point P175 (119.172, 12.125374)
  point P176 (134.613, 11.015374)
  point P177 (150.207, 9.977374)
  point P178 (165.783, 9.062374)
  point P179 (181.167, 8.312374)
  point P180 (196.068, 7.712374)
  point P181 (210.468, 7.274374)
  point P182 (224.22, 7.049374)
  point P183 (237.189, 7.088374)
  point P184 (249.246, 7.427374)
  point P185 (260.262, 8.099374)
  point P186 (278.739, 10.511374)
  point P187 (285.993, 12.260374)
  point P188 (296.121, 16.805374)
  point P189 (298.863, 19.580374)
  point P190 (300, 22.673374)
  point P191 (225.700031, -0.009448)
  point P192 (252.261653, 0.521981)
  point P193 (227.349521, 41.450759)
  point P194 (105.977751, 6.07821)
  point P195 (115.800844, 5.327728)
  point P196 (98.259993, 27.173842)
  point P197 (260.452219, 30.122789)
  point P198 (123.585295, 30.371797)
  point P199 (134.59788, 31.560388)
  dimension "d38" = 10.78
  dimension "d67" = 12
  dimension "d17" = 100
  dimension "d19" = 20.241
  dimension "d20" = 238.581
  dimension "d21" = 28
  dimension "d37" = 112
  dimension "d39" = 112
  dimension "d40" = 0
  dimension "d43" = 10
  dimension "d44" = 10
  dimension "d55" = 4
  dimension "d56" = 90
  dimension "d58" = 4
  dimension "d60" = 8
  dimension "d62" = 0.819
  dimension "d63" = 24.735
  dimension "d65" = 25.8
  dimension "d66" = 8.458
sketch "Sketch1 outline for Extrusion3" plane through (0, 0, 0) normal (0, 0, 1) x (1, 0, 0)
  spline S0 degree 4 poles (0, 15.183769) (-0.001046, 15.183856) (-0.002088, 15.183942) (-0.003126, 15.184028) (-0.004161, 15.184114) knots 0 0 0 0 0 1 1 1 1 1
  spline S1 degree 4 poles (224.22, 0) (222.479951, 0.013004) (217.292297, 0.069187) (208.469243, 0.245463) (195.775416, 0.645033) (180.96771, 1.249367) (165.65166, 1.982539) (150.191633, 2.90484) (134.687258, 3.945111) (119.337536, 5.049498) (104.304232, 6.19869) (89.75661, 7.356132) (75.849241, 8.488651) (62.742943, 9.582403) (50.581067, 10.622604) (39.497088, 11.57965) (29.629376, 12.451281) (21.071247, 13.226368) (13.963939, 13.872105) (7.107973, 14.512211) (2.97534, 14.899015) (0.541913, 15.138823) (0, 15.183769) knots 0 0 0 0 0 0.02936819 0.08711706 0.14611338 0.20604122 0.26657745 0.32739466 0.3880942 0.44833615 0.50777977 0.56607692 0.6228709 0.67779016 0.73044036 0.78040055 0.82720513 0.87031346 0.90906968 0.94257262 1 1 1 1 1
  line L0 (224.22, 0) -> (238.581, 2.241)
  arc A0 (238.581, 2.241) -> (251.319332, 7.523497) centre (238.581, 20.241) ccw
  spline S2 degree 4 poles (268.129, 8.876482) (267.350973, 8.784165) (264.070152, 8.41388) (259.922783, 8.03946) (255.648904, 7.749196) (252.134203, 7.563785) (251.319332, 7.523497) knots 0 0 0 0 0 0.19446677 0.81409157 1 1 1 1 1
  line L1 (268.129, 8.876482) -> (268.129, 13.624)
  arc A1 (268.129, 13.624) -> (272.129, 13.624) centre (270.129, 13.624) cw
  line L2 (272.129, 13.624) -> (272.129, 9.39886)
  spline S3 degree 4 poles (295.835285, 16.564433) (293.417091, 14.88464) (288.41352, 12.692641) (282.206639, 11.063603) (275.277329, 9.862415) (272.65595, 9.474358) (272.129, 9.39886) knots 0 0 0 0 0 0.63339451 0.92674211 1 1 1 1 1
  spline S4 degree 4 poles (295.835285, 16.564433) (295.712426, 16.670837) (294.579422, 17.632282) (292.055318, 19.430045) (287.516704, 21.93465) (281.462074, 24.423147) (276.515305, 26.06668) (273.276333, 27.014249) (272.129, 27.335374) knots 0 0 0 0 0 0.03023743 0.27499105 0.54581841 0.84138126 1 1 1 1 1
  line L3 (272.129, 27.335374) -> (272.129, 24.172)
  arc A2 (272.129, 24.172) -> (268.129, 24.172) centre (270.129, 24.172) cw
  line L4 (268.129, 24.172) -> (268.129, 28.393044)
  spline S5 degree 4 poles (268.129, 28.393044) (267.95313, 28.436967) (265.243797, 29.109201) (261.874729, 29.863619) (258.409244, 30.551465) (255.053616, 31.142888) (254.436054, 31.249298) (253.968946, 31.329784) (253.501839, 31.41027) (253.034731, 31.490756) (252.567623, 31.571241) knots 0 0 0 0 0 0.04751866 0.73070527 0.88402957 0.88402957 0.88402957 0.88402957 1 1 1 1 1
  arc A3 (252.567623, 31.571241) -> (238.581, 38.241) centre (238.581, 20.241) ccw
  line L5 (238.581, 38.241) -> (225.78, 41.559)
  spline S6 degree 4 poles (225.78, 41.559) (223.981701, 41.678798) (218.618296, 41.998081) (209.491978, 42.356496) (196.392584, 42.47009) (181.031283, 42.070233) (165.506388, 41.221743) (149.785249, 40.04478) (134.1096, 38.577548) (118.624688, 36.850842) (103.500036, 34.939301) (88.901638, 32.883406) (74.995754, 30.738214) (61.917783, 28.562704) (49.827113, 26.40977) (38.835364, 24.340018) (29.07721, 22.403865) (20.632296, 20.65644) (13.645605, 19.149082) (6.913163, 17.660714) (2.90218, 16.740022) (0.469137, 16.188187) (0, 16.065) knots 0 0 0 0 0 0.02971241 0.08811623 0.14764545 0.20795901 0.26872109 0.32959596 0.39031605 0.45054625 0.50994444 0.56816554 0.62484975 0.67962982 0.73211898 0.78189715 0.82850859 0.87142025 0.90998584 0.94331385 1 1 1 1 1
  arc A4 (0, 16.065) -> (-0.004161, 15.184114) centre (0.115799, 15.624) ccw
  arc A5 (130.237617, 11.322439) -> (132.12991, 31.350801) centre (142.78, 20.241) cw
  spline S7 degree 4 poles (209.287499, 35.276521) (208.016254, 35.302234) (203.394539, 35.374392) (192.107099, 35.419415) (181.42777, 35.055508) (165.177387, 34.181901) (152.027787, 33.293306) (140.12289, 32.036547) (134.373831, 31.53661) (132.12991, 31.350801) knots 0 0 0 0 0 0.08041067 0.26080902 0.46236226 0.66541434 0.85998968 1 1 1 1 1
  arc A6 (209.287499, 35.276521) -> (210.772015, 7.267069) centre (190.581, 20.241) cw
  spline S8 degree 4 poles (210.772015, 7.267069) (208.879361, 7.312262) (203.376792, 7.457482) (194.11369, 7.76222) (180.967993, 8.298721) (165.65086, 9.03198) (151.022109, 9.904617) (140.198122, 10.625231) (133.276252, 11.107079) (130.237617, 11.322439) knots 0 0 0 0 0 0.09754364 0.2824031 0.47018137 0.65986596 0.85043099 1 1 1 1 1
  line L6 (83.800898, 13.422) -> (80.336797, 19.422)
  line L7 (80.336797, 19.422) -> (83.800898, 25.422)
  line L8 (83.800898, 25.422) -> (90.729102, 25.422)
  line L9 (90.729102, 25.422) -> (94.193203, 19.422)
  line L10 (94.193203, 19.422) -> (90.729102, 13.422)
  line L11 (90.729102, 13.422) -> (83.800898, 13.422)
  circle A7 centre (112, 20.241) radius 4.229
  circle A8 centre (238.581, 20.241) radius 12.9
extrude "Extrusion3" add sketch "Sketch1 outline for Extrusion3" along normal blind 4
fillet "Fillet3" radius 3 1 edges at (295.8353, 16.5644, 2)
properties part number "Rib V6 Aileron BB" material "Wood (Maple)"
